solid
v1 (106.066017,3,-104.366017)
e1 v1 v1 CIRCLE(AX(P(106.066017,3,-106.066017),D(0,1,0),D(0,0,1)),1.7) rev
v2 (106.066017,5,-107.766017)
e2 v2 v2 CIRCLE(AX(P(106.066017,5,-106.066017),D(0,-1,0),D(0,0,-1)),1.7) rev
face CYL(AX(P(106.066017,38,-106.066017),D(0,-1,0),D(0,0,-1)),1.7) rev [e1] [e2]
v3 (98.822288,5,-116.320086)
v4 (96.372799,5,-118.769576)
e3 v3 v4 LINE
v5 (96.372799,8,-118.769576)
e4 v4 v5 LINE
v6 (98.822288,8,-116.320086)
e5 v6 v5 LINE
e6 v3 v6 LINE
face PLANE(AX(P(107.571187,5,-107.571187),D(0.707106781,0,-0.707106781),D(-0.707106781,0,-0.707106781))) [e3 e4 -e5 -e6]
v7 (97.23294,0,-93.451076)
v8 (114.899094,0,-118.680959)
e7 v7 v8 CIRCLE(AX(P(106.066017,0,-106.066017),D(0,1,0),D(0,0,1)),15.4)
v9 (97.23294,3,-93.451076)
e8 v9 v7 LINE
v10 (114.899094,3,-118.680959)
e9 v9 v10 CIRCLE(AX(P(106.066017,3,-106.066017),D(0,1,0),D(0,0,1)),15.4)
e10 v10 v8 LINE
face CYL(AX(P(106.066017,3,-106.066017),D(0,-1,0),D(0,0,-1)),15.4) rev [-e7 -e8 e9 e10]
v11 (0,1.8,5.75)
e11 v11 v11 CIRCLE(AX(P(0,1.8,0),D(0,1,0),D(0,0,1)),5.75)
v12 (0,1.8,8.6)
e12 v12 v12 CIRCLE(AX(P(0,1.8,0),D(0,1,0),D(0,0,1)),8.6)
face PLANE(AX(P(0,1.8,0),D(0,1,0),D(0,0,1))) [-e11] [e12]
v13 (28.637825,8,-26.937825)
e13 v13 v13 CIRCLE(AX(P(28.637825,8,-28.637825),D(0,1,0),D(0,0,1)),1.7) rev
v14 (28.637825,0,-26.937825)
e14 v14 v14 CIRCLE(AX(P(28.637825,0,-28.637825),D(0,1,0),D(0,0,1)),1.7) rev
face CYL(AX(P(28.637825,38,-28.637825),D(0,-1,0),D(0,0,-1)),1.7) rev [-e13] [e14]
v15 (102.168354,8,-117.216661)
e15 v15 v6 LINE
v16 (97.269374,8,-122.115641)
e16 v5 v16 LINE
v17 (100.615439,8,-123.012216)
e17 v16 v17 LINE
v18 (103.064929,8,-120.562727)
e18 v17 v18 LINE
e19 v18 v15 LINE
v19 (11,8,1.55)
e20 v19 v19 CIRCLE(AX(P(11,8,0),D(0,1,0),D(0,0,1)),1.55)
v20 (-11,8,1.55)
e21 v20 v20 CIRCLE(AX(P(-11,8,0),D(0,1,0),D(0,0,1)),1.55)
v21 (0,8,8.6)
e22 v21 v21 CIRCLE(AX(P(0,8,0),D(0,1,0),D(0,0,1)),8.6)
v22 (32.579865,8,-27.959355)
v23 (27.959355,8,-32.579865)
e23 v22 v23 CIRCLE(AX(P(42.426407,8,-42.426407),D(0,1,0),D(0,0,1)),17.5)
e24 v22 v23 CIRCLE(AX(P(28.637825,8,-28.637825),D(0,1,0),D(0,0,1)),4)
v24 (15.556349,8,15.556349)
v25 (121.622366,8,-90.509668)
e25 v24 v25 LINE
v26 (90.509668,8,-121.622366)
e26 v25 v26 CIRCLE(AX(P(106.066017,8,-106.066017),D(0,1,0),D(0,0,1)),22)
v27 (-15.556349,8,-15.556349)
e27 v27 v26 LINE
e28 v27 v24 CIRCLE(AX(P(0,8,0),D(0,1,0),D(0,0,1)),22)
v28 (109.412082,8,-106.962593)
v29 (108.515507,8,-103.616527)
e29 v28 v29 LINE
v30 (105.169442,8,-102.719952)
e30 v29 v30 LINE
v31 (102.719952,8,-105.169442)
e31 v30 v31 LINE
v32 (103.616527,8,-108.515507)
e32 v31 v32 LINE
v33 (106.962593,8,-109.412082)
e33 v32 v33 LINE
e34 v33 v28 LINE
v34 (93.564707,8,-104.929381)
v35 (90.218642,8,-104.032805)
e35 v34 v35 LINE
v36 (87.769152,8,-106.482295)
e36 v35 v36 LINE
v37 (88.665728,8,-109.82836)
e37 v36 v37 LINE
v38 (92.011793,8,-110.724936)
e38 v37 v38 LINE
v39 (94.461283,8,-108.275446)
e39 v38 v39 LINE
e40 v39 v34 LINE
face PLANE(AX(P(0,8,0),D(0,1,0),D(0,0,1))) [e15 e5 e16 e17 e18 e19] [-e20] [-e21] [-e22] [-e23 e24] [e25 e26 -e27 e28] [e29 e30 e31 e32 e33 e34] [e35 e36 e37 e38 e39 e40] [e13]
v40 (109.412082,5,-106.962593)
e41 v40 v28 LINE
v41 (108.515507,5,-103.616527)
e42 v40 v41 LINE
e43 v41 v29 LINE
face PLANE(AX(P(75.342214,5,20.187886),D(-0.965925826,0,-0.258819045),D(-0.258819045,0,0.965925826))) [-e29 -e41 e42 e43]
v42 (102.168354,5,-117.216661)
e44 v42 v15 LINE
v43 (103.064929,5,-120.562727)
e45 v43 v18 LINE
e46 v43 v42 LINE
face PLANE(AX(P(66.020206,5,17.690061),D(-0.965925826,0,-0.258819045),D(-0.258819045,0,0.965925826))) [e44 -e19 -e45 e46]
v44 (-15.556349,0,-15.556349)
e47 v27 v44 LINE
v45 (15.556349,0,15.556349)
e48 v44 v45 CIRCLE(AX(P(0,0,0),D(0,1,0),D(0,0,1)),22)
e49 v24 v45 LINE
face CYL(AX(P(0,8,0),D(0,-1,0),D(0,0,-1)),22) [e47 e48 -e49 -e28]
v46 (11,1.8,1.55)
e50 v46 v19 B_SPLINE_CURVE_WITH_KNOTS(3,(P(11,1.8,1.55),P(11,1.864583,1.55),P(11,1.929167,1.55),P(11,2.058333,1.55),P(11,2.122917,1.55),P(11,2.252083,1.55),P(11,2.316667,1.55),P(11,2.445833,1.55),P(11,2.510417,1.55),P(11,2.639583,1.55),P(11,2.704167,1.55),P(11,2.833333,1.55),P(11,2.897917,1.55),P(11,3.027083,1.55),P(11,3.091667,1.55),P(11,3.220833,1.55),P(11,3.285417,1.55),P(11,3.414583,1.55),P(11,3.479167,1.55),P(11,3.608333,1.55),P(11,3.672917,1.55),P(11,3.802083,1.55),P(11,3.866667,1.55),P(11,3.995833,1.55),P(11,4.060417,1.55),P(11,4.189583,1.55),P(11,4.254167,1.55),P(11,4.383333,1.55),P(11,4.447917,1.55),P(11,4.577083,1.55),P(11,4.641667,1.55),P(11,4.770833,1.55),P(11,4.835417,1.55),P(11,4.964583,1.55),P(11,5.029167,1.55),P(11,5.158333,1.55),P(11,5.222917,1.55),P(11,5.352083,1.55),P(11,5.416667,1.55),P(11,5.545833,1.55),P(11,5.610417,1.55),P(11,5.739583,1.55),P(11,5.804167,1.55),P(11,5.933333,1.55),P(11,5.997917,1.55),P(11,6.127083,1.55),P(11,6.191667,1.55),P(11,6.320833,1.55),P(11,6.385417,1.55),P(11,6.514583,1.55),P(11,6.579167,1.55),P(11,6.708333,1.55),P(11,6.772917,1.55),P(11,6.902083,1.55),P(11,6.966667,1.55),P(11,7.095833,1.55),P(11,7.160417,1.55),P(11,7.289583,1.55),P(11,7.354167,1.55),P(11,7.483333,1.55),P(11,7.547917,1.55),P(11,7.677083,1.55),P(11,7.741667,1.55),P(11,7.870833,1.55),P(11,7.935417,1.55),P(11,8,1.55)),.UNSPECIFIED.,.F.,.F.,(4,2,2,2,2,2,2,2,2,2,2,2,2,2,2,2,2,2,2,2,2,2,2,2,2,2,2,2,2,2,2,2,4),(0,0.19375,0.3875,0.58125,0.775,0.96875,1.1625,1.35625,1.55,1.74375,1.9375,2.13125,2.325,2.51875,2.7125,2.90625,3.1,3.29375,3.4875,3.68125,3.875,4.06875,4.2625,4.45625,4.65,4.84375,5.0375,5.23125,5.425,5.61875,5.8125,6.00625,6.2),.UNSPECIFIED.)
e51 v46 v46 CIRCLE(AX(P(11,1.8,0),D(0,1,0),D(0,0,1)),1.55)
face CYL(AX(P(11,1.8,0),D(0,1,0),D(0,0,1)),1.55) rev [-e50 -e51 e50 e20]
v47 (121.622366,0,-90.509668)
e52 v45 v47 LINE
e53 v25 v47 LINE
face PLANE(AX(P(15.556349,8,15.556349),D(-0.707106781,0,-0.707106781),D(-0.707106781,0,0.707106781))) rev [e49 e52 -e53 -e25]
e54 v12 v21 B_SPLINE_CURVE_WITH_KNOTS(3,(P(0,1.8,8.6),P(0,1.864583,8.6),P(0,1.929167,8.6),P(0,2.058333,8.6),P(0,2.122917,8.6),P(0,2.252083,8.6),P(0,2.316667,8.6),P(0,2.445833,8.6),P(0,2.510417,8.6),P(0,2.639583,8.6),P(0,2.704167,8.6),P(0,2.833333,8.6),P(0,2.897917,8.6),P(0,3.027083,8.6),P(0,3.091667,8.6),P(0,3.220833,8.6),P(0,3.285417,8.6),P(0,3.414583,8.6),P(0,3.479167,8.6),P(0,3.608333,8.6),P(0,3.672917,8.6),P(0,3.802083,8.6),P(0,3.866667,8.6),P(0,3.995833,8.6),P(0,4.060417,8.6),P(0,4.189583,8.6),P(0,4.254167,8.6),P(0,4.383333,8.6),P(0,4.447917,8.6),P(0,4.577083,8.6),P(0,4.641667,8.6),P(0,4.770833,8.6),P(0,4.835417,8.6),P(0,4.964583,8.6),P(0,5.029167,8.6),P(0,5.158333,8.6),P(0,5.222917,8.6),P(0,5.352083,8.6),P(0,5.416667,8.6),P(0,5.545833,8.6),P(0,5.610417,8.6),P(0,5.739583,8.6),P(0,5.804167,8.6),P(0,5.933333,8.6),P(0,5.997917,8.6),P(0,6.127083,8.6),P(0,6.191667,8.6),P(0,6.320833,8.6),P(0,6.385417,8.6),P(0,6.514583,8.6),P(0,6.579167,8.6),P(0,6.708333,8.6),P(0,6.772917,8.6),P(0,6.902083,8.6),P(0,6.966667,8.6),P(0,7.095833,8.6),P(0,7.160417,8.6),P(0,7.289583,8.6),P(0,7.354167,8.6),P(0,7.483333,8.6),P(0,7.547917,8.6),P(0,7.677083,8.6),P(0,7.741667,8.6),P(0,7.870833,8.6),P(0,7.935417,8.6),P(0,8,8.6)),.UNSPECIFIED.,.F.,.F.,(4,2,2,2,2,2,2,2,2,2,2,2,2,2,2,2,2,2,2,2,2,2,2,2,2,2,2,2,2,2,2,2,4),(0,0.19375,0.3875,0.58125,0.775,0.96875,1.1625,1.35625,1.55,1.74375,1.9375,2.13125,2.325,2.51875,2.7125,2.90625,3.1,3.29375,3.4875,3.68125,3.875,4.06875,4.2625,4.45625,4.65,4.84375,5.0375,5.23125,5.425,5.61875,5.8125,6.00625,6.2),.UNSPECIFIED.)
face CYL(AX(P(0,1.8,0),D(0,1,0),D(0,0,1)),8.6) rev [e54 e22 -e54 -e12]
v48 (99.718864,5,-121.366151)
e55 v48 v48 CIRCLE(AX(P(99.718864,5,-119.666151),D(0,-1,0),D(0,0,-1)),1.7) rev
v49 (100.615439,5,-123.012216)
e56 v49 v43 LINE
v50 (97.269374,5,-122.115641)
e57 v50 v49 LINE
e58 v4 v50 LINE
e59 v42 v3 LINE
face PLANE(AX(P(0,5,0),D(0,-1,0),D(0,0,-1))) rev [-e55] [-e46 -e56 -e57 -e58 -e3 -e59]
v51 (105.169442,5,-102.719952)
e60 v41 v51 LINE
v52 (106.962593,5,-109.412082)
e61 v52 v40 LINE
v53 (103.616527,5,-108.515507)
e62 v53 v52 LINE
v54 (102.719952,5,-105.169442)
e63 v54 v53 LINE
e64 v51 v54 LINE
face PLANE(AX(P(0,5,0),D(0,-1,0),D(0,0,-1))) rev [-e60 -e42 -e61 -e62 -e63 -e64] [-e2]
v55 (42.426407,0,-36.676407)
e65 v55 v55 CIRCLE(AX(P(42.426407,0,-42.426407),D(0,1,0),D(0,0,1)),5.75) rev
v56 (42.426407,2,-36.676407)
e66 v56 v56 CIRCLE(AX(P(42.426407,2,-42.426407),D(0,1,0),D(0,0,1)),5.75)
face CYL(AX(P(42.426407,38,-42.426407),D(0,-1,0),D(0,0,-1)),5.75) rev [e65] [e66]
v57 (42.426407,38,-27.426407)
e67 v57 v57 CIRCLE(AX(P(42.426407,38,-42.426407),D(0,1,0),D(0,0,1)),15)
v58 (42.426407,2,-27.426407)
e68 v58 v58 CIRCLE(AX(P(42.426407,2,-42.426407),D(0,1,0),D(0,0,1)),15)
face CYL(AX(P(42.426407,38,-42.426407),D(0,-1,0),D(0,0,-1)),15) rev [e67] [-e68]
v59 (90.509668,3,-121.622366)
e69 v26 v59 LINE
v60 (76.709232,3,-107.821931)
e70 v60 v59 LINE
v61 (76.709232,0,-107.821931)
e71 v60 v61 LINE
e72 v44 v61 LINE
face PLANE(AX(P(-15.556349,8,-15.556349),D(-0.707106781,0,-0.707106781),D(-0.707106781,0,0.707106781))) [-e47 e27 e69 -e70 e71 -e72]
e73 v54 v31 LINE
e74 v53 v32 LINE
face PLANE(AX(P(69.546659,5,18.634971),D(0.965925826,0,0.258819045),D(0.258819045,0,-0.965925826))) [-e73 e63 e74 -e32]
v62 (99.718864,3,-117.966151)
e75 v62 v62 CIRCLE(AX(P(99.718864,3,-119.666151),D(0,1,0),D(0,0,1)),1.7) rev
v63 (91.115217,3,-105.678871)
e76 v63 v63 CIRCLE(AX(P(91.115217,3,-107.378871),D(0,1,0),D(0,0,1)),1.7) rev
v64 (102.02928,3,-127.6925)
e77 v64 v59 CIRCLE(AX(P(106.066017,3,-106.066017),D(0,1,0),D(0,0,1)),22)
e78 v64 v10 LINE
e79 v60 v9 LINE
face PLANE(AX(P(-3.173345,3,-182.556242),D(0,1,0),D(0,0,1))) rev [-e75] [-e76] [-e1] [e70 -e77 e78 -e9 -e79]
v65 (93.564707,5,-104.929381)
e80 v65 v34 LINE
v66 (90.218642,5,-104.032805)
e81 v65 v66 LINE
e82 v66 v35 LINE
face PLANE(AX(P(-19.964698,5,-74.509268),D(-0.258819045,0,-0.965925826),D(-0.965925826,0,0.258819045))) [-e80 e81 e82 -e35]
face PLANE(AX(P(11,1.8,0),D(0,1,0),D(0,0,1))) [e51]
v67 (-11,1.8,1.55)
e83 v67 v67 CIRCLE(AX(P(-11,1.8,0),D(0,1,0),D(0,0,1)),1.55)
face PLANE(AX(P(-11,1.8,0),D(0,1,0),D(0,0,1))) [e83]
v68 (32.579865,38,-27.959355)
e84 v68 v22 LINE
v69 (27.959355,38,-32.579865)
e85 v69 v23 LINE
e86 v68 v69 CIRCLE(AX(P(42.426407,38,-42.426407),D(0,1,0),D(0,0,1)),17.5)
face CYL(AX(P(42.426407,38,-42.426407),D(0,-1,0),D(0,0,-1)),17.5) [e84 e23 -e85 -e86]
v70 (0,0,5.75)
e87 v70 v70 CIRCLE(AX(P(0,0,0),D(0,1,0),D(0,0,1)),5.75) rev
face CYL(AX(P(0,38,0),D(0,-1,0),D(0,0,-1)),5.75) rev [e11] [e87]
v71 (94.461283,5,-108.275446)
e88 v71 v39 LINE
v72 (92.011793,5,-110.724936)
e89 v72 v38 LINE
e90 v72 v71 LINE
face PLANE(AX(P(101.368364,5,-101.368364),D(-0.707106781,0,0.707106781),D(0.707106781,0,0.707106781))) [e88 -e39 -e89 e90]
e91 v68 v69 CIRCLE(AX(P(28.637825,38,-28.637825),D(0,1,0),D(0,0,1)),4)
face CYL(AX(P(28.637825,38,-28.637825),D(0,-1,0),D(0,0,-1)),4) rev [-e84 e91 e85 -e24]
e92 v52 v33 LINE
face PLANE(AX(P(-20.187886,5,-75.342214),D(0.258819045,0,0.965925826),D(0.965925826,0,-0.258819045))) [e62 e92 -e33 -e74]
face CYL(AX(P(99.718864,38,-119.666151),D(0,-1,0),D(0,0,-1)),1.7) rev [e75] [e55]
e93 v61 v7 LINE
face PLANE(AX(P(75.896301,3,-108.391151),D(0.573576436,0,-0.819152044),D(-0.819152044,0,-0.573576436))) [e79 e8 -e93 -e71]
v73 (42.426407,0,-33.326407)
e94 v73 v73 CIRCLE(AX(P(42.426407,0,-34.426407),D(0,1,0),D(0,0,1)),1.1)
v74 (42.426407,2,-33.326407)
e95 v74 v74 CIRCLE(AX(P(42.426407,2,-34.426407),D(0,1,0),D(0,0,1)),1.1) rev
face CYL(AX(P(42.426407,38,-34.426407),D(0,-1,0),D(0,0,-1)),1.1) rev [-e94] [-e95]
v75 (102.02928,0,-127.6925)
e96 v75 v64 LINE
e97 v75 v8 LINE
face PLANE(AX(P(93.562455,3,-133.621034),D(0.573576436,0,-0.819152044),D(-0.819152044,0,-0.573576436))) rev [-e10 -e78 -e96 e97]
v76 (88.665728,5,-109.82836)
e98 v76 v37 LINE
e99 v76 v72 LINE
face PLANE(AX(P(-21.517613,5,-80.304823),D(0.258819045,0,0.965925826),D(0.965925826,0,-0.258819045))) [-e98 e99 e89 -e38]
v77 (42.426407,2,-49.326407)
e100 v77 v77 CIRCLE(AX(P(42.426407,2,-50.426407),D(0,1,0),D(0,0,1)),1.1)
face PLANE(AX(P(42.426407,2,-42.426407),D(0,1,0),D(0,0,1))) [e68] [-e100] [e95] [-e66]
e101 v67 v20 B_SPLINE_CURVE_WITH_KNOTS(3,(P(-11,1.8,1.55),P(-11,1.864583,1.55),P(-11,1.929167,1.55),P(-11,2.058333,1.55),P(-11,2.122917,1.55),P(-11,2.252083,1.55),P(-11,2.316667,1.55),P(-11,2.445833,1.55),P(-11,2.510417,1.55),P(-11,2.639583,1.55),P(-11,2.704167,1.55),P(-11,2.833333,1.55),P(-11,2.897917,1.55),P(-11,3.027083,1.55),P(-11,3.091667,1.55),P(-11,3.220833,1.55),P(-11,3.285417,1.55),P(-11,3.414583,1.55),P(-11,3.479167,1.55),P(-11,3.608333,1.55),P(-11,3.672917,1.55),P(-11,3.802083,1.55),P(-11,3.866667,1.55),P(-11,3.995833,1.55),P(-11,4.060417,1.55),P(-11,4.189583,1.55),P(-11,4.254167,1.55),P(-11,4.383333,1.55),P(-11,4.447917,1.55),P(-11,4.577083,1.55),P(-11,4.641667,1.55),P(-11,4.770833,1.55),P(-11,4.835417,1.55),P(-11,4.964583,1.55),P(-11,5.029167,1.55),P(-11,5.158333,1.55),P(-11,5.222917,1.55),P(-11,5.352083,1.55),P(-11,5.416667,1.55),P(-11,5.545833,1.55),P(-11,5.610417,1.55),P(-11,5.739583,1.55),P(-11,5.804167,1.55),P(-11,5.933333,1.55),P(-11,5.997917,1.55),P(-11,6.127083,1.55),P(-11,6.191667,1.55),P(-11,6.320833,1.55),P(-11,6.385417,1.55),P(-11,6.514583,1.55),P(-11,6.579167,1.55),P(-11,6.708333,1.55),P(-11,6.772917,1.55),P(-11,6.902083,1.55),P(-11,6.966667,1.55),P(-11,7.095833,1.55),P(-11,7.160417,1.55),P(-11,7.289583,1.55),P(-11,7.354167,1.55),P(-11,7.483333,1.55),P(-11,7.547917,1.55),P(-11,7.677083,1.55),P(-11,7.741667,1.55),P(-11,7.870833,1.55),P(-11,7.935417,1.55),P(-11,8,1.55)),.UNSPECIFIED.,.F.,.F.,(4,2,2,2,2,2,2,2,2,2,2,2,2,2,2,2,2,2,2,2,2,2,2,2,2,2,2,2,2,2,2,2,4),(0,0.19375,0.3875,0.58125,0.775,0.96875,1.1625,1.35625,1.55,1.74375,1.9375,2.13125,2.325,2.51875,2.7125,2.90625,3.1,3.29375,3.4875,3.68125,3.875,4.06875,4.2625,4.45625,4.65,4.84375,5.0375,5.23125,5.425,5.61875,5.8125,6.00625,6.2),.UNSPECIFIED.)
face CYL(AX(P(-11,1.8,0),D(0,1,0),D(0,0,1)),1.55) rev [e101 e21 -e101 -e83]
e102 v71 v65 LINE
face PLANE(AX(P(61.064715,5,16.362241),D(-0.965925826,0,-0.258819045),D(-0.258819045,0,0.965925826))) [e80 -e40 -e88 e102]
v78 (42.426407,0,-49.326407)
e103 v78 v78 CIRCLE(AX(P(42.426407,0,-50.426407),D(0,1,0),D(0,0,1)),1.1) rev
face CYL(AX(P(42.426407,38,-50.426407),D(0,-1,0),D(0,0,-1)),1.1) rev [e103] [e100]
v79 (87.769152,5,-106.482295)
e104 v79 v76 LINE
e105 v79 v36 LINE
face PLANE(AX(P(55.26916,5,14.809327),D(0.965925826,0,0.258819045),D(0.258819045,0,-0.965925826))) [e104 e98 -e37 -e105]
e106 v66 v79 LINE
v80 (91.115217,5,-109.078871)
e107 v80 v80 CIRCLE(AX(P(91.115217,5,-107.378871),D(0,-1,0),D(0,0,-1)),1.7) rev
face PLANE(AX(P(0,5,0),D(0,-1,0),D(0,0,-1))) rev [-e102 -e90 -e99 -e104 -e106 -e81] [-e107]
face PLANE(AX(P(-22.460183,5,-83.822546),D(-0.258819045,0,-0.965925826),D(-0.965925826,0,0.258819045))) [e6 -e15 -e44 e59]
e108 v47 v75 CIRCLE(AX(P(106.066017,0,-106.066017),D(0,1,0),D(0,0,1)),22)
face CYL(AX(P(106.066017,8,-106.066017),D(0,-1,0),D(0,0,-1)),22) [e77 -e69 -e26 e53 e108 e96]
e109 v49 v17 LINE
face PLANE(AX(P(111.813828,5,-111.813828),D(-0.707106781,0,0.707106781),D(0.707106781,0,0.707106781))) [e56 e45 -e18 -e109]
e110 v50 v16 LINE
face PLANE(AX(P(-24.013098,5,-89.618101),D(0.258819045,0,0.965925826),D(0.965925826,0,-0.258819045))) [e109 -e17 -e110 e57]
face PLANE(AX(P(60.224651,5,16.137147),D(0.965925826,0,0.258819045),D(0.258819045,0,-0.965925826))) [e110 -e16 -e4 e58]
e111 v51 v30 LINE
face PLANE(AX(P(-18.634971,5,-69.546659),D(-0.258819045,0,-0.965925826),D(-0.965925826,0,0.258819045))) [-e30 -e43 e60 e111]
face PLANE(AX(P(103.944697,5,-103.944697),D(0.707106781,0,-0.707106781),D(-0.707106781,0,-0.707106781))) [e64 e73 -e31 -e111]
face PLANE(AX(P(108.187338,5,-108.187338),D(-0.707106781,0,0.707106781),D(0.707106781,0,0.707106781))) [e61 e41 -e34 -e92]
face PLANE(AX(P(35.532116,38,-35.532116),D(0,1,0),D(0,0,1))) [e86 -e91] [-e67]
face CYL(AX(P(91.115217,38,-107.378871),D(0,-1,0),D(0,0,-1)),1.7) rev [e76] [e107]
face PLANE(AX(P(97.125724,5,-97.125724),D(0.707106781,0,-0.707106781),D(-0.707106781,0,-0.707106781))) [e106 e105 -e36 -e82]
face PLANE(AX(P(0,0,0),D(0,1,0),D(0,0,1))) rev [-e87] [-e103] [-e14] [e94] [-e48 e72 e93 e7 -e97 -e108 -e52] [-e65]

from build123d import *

# Parameters (mm, degrees)
BOSS_EXTRUDE1_DEPTH       = 8
BOSS_EXTRUDE3_START       = 8
SKETCH4_R                 = 15
BOSS_EXTRUDE3_DEPTH       = 30
CUT_EXTRUDE9_DEPTH        = 186.056233377
CUT_EXTRUDE9_DEPTH_BACK   = 186.056233377
SKETCH4_5_R               = 5.75
SKETCH4_5_R_2             = 1.1
SKETCH4_5_R_3             = 1.7
CUT_EXTRUDE5_START        = 8
SKETCH1_8_R               = 1.7
CUT_EXTRUDE5_DEPTH        = 3
CUT_EXTRUDE6_DEPTH        = 3
CUT_EXTRUDE11_START       = 1.8
SKETCH4_7_R               = 8.6
SKETCH4_7_R_2             = 5.75
SKETCH4_7_R_3             = 1.55
CUT_EXTRUDE11_DEPTH       = 6.2
CUT_EXTRUDE13_DEPTH       = 186.056233377
CUT_EXTRUDE13_DEPTH_BACK  = 186.056233377
SKETCH1_10_R              = 1.7
CUT_EXTRUDE14_START       = 2
CUT_EXTRUDE14_OUTLINE_R   = 15
CUT_EXTRUDE14_OUTLINE_R_2 = 1.1
CUT_EXTRUDE14_OUTLINE_R_3 = 5.75
CUT_EXTRUDE14_DEPTH       = 6


# Read off the part's stored shape, not the designer's step: Cut-Extrude14
with BuildPart() as part:
    # Sketch1 → Boss-Extrude1 (new body)
    with BuildSketch(Plane(origin=(0, 0, 0), x_dir=(1, 0, 0), z_dir=(0, 1, 0))):
        with BuildLine():
            Line((-15.556349186, 15.556349186), (90.509667992, 121.622366364))
            ThreePointArc((90.509667992, 121.622366364), (121.622366364, 121.622366364), (121.622366364, 90.509667992))
            Line((121.622366364, 90.509667992), (15.556349186, -15.556349186))
            ThreePointArc((15.556349186, -15.556349186), (-15.556349186, -15.556349186), (-15.556349186, 15.556349186))
        make_face()
    extrude(amount=BOSS_EXTRUDE1_DEPTH)

    # Sketch4 → Boss-Extrude3 (add)
    with BuildSketch(Plane(origin=(0, 0, 0), x_dir=(1, 0, 0), z_dir=(0, 1, 0)).offset(BOSS_EXTRUDE3_START)):
        with BuildLine():
            ThreePointArc((32.579864505, 27.95935453), (50.609789686, 26.957656252), (59.926406871, 42.426406871))
            ThreePointArc((59.926406871, 42.426406871), (37.274873894, 59.150990812), (27.95935453, 32.579864505))
            ThreePointArc((27.95935453, 32.579864505), (31.215238028, 31.696736244), (32.637824638, 28.637824638))
            ThreePointArc((32.637824638, 28.637824638), (32.623308264, 28.297353984), (32.579864505, 27.95935453))
        make_face()
        with Locations(Location((42.426406871, 42.426406871, 0), (0, 0, 270))):
            Circle(SKETCH4_R, mode=Mode.SUBTRACT)
    extrude(amount=BOSS_EXTRUDE3_DEPTH)

    # Sketch4<5> → Cut-Extrude9 (cut, two sides: drawn at the far end of the back side and taken through both)
    with BuildSketch(Plane(origin=(0, 0, 0), x_dir=(1, 0, 0), z_dir=(0, 1, 0)).offset(-CUT_EXTRUDE9_DEPTH_BACK)):
        with Locations(Location((0, 0, 0), (0, 0, 270))):
            Circle(SKETCH4_5_R)
        with Locations(Location((42.426406871, 42.426406871, 0), (0, 0, 270))):
            Circle(SKETCH4_5_R)
        with Locations(Location((42.426406871, 50.426406871, 0), (0, 0, 270))):
            Circle(SKETCH4_5_R_2)
        with Locations(Location((42.426406871, 34.426406871, 0), (0, 0, 270))):
            Circle(SKETCH4_5_R_2)
        with Locations(Location((28.637824638, 28.637824638, 0), (0, 0, 270))):
            Circle(SKETCH4_5_R_3)
    extrude(amount=CUT_EXTRUDE9_DEPTH + CUT_EXTRUDE9_DEPTH_BACK, mode=Mode.SUBTRACT)

    # Sketch1<8> → Cut-Extrude5 (cut)
    # profile 1 of 3: a face of its own
    with BuildSketch(Plane(origin=(0, 0, 0), x_dir=(1, 0, 0), z_dir=(0, 1, 0)).offset(CUT_EXTRUDE5_START)):
        Polygon((102.168353618, 117.21666144), (103.06492909, 120.562726655), (100.615439347, 123.012216398), (97.269374132, 122.115640925), (96.37279866, 118.769575711), (98.822288403, 116.320085968), align=None)
        with Locations(Location((99.718863875, 119.666151183, 0), (0, 0, 270))):
            Circle(SKETCH1_8_R, mode=Mode.SUBTRACT)
    # profile 2 of 3: a face of its own
    with BuildSketch(Plane(origin=(0, 0, 0), x_dir=(1, 0, 0), z_dir=(0, 1, 0)).offset(CUT_EXTRUDE5_START)):
        Polygon((88.665727587, 109.828360261), (87.769152115, 106.482295046), (90.218641857, 104.032805303), (93.564707072, 104.929380776), (94.461282545, 108.275445991), (92.011792802, 110.724935733), align=None)
        with Locations(Location((91.11521733, 107.378870518, 0), (0, 0, 270))):
            Circle(SKETCH1_8_R, mode=Mode.SUBTRACT)
    # profile 3 of 3: a face of its own
    with BuildSketch(Plane(origin=(0, 0, 0), x_dir=(1, 0, 0), z_dir=(0, 1, 0)).offset(CUT_EXTRUDE5_START)):
        Polygon((108.515506921, 103.616527435), (109.412082393, 106.96259265), (106.96259265, 109.412082393), (103.616527435, 108.515506921), (102.719951963, 105.169441706), (105.169441706, 102.719951963), align=None)
        with Locations(Location((106.066017178, 106.066017178, 0), (0, 0, 270))):
            Circle(SKETCH1_8_R, mode=Mode.SUBTRACT)
    extrude(amount=-CUT_EXTRUDE5_DEPTH, mode=Mode.SUBTRACT)

    # Sketch1<9> → Cut-Extrude6 (cut)
    with BuildSketch(Plane(origin=(0, 0, 0), x_dir=(1, 0, 0), z_dir=(0, 1, 0))):
        with BuildLine():
            Line((97.232940058, 93.451075696), (-12.006422067, 169.941300525))
            ThreePointArc((-12.006422067, 169.941300525), (-15.788286429, 191.389319127), (5.659732173, 195.171183489))
            Line((5.659732173, 195.171183489), (114.899094298, 118.68095866))
            ThreePointArc((114.899094298, 118.68095866), (118.68095866, 97.232940058), (97.232940058, 93.451075696))
        make_face()
    extrude(amount=CUT_EXTRUDE6_DEPTH, mode=Mode.SUBTRACT)

    # Sketch4<7> → Cut-Extrude11 (cut)
    # profile 1 of 3: a face of its own
    with BuildSketch(Plane(origin=(0, 0, 0), x_dir=(1, 0, 0), z_dir=(0, 1, 0)).offset(CUT_EXTRUDE11_START)):
        with Locations(Location((0, 0, 0), (0, 0, 270))):
            Circle(SKETCH4_7_R)
        with Locations(Location((0, 0, 0), (0, 0, 270))):
            Circle(SKETCH4_7_R_2, mode=Mode.SUBTRACT)
    # profile 2 of 3: a face of its own
    with BuildSketch(Plane(origin=(0, 0, 0), x_dir=(1, 0, 0), z_dir=(0, 1, 0)).offset(CUT_EXTRUDE11_START)):
        with Locations(Location((11, 0, 0), (0, 0, 270))):
            Circle(SKETCH4_7_R_3)
    # profile 3 of 3: a face of its own
    with BuildSketch(Plane(origin=(0, 0, 0), x_dir=(1, 0, 0), z_dir=(0, 1, 0)).offset(CUT_EXTRUDE11_START)):
        with Locations(Location((-11, 0, 0), (0, 0, 270))):
            Circle(SKETCH4_7_R_3)
    extrude(amount=CUT_EXTRUDE11_DEPTH, mode=Mode.SUBTRACT)

    # Sketch1<10> → Cut-Extrude13 (cut, two sides: drawn at the far end of the back side and taken through both)
    with BuildSketch(Plane(origin=(0, 0, 0), x_dir=(1, 0, 0), z_dir=(0, 1, 0)).offset(-CUT_EXTRUDE13_DEPTH_BACK)):
        with Locations(Location((99.718863875, 119.666151183, 0), (0, 0, 90))):
            Circle(SKETCH1_10_R)
        with Locations(Location((91.11521733, 107.378870518, 0), (0, 0, 90))):
            Circle(SKETCH1_10_R)
        with Locations(Location((106.066017178, 106.066017178, 0), (0, 0, 90))):
            Circle(SKETCH1_10_R)
    extrude(amount=CUT_EXTRUDE13_DEPTH + CUT_EXTRUDE13_DEPTH_BACK, mode=Mode.SUBTRACT)

    # Cut-Extrude14 outline → Cut-Extrude14 (cut)
    with BuildSketch(Plane(origin=(0, 0, 0), x_dir=(1, 0, 0), z_dir=(0, 1, 0)).offset(CUT_EXTRUDE14_START)):
        with Locations((42.426406871, 42.426406871)):
            Circle(CUT_EXTRUDE14_OUTLINE_R)
        with Locations((42.426406871, 34.426406871)):
            Circle(CUT_EXTRUDE14_OUTLINE_R_2, mode=Mode.SUBTRACT)
        with Locations((42.426406871, 42.426406871)):
            Circle(CUT_EXTRUDE14_OUTLINE_R_3, mode=Mode.SUBTRACT)
        with Locations((42.426406871, 50.426406871)):
            Circle(CUT_EXTRUDE14_OUTLINE_R_2, mode=Mode.SUBTRACT)
    extrude(amount=CUT_EXTRUDE14_DEPTH, mode=Mode.SUBTRACT)


solid = part.part
